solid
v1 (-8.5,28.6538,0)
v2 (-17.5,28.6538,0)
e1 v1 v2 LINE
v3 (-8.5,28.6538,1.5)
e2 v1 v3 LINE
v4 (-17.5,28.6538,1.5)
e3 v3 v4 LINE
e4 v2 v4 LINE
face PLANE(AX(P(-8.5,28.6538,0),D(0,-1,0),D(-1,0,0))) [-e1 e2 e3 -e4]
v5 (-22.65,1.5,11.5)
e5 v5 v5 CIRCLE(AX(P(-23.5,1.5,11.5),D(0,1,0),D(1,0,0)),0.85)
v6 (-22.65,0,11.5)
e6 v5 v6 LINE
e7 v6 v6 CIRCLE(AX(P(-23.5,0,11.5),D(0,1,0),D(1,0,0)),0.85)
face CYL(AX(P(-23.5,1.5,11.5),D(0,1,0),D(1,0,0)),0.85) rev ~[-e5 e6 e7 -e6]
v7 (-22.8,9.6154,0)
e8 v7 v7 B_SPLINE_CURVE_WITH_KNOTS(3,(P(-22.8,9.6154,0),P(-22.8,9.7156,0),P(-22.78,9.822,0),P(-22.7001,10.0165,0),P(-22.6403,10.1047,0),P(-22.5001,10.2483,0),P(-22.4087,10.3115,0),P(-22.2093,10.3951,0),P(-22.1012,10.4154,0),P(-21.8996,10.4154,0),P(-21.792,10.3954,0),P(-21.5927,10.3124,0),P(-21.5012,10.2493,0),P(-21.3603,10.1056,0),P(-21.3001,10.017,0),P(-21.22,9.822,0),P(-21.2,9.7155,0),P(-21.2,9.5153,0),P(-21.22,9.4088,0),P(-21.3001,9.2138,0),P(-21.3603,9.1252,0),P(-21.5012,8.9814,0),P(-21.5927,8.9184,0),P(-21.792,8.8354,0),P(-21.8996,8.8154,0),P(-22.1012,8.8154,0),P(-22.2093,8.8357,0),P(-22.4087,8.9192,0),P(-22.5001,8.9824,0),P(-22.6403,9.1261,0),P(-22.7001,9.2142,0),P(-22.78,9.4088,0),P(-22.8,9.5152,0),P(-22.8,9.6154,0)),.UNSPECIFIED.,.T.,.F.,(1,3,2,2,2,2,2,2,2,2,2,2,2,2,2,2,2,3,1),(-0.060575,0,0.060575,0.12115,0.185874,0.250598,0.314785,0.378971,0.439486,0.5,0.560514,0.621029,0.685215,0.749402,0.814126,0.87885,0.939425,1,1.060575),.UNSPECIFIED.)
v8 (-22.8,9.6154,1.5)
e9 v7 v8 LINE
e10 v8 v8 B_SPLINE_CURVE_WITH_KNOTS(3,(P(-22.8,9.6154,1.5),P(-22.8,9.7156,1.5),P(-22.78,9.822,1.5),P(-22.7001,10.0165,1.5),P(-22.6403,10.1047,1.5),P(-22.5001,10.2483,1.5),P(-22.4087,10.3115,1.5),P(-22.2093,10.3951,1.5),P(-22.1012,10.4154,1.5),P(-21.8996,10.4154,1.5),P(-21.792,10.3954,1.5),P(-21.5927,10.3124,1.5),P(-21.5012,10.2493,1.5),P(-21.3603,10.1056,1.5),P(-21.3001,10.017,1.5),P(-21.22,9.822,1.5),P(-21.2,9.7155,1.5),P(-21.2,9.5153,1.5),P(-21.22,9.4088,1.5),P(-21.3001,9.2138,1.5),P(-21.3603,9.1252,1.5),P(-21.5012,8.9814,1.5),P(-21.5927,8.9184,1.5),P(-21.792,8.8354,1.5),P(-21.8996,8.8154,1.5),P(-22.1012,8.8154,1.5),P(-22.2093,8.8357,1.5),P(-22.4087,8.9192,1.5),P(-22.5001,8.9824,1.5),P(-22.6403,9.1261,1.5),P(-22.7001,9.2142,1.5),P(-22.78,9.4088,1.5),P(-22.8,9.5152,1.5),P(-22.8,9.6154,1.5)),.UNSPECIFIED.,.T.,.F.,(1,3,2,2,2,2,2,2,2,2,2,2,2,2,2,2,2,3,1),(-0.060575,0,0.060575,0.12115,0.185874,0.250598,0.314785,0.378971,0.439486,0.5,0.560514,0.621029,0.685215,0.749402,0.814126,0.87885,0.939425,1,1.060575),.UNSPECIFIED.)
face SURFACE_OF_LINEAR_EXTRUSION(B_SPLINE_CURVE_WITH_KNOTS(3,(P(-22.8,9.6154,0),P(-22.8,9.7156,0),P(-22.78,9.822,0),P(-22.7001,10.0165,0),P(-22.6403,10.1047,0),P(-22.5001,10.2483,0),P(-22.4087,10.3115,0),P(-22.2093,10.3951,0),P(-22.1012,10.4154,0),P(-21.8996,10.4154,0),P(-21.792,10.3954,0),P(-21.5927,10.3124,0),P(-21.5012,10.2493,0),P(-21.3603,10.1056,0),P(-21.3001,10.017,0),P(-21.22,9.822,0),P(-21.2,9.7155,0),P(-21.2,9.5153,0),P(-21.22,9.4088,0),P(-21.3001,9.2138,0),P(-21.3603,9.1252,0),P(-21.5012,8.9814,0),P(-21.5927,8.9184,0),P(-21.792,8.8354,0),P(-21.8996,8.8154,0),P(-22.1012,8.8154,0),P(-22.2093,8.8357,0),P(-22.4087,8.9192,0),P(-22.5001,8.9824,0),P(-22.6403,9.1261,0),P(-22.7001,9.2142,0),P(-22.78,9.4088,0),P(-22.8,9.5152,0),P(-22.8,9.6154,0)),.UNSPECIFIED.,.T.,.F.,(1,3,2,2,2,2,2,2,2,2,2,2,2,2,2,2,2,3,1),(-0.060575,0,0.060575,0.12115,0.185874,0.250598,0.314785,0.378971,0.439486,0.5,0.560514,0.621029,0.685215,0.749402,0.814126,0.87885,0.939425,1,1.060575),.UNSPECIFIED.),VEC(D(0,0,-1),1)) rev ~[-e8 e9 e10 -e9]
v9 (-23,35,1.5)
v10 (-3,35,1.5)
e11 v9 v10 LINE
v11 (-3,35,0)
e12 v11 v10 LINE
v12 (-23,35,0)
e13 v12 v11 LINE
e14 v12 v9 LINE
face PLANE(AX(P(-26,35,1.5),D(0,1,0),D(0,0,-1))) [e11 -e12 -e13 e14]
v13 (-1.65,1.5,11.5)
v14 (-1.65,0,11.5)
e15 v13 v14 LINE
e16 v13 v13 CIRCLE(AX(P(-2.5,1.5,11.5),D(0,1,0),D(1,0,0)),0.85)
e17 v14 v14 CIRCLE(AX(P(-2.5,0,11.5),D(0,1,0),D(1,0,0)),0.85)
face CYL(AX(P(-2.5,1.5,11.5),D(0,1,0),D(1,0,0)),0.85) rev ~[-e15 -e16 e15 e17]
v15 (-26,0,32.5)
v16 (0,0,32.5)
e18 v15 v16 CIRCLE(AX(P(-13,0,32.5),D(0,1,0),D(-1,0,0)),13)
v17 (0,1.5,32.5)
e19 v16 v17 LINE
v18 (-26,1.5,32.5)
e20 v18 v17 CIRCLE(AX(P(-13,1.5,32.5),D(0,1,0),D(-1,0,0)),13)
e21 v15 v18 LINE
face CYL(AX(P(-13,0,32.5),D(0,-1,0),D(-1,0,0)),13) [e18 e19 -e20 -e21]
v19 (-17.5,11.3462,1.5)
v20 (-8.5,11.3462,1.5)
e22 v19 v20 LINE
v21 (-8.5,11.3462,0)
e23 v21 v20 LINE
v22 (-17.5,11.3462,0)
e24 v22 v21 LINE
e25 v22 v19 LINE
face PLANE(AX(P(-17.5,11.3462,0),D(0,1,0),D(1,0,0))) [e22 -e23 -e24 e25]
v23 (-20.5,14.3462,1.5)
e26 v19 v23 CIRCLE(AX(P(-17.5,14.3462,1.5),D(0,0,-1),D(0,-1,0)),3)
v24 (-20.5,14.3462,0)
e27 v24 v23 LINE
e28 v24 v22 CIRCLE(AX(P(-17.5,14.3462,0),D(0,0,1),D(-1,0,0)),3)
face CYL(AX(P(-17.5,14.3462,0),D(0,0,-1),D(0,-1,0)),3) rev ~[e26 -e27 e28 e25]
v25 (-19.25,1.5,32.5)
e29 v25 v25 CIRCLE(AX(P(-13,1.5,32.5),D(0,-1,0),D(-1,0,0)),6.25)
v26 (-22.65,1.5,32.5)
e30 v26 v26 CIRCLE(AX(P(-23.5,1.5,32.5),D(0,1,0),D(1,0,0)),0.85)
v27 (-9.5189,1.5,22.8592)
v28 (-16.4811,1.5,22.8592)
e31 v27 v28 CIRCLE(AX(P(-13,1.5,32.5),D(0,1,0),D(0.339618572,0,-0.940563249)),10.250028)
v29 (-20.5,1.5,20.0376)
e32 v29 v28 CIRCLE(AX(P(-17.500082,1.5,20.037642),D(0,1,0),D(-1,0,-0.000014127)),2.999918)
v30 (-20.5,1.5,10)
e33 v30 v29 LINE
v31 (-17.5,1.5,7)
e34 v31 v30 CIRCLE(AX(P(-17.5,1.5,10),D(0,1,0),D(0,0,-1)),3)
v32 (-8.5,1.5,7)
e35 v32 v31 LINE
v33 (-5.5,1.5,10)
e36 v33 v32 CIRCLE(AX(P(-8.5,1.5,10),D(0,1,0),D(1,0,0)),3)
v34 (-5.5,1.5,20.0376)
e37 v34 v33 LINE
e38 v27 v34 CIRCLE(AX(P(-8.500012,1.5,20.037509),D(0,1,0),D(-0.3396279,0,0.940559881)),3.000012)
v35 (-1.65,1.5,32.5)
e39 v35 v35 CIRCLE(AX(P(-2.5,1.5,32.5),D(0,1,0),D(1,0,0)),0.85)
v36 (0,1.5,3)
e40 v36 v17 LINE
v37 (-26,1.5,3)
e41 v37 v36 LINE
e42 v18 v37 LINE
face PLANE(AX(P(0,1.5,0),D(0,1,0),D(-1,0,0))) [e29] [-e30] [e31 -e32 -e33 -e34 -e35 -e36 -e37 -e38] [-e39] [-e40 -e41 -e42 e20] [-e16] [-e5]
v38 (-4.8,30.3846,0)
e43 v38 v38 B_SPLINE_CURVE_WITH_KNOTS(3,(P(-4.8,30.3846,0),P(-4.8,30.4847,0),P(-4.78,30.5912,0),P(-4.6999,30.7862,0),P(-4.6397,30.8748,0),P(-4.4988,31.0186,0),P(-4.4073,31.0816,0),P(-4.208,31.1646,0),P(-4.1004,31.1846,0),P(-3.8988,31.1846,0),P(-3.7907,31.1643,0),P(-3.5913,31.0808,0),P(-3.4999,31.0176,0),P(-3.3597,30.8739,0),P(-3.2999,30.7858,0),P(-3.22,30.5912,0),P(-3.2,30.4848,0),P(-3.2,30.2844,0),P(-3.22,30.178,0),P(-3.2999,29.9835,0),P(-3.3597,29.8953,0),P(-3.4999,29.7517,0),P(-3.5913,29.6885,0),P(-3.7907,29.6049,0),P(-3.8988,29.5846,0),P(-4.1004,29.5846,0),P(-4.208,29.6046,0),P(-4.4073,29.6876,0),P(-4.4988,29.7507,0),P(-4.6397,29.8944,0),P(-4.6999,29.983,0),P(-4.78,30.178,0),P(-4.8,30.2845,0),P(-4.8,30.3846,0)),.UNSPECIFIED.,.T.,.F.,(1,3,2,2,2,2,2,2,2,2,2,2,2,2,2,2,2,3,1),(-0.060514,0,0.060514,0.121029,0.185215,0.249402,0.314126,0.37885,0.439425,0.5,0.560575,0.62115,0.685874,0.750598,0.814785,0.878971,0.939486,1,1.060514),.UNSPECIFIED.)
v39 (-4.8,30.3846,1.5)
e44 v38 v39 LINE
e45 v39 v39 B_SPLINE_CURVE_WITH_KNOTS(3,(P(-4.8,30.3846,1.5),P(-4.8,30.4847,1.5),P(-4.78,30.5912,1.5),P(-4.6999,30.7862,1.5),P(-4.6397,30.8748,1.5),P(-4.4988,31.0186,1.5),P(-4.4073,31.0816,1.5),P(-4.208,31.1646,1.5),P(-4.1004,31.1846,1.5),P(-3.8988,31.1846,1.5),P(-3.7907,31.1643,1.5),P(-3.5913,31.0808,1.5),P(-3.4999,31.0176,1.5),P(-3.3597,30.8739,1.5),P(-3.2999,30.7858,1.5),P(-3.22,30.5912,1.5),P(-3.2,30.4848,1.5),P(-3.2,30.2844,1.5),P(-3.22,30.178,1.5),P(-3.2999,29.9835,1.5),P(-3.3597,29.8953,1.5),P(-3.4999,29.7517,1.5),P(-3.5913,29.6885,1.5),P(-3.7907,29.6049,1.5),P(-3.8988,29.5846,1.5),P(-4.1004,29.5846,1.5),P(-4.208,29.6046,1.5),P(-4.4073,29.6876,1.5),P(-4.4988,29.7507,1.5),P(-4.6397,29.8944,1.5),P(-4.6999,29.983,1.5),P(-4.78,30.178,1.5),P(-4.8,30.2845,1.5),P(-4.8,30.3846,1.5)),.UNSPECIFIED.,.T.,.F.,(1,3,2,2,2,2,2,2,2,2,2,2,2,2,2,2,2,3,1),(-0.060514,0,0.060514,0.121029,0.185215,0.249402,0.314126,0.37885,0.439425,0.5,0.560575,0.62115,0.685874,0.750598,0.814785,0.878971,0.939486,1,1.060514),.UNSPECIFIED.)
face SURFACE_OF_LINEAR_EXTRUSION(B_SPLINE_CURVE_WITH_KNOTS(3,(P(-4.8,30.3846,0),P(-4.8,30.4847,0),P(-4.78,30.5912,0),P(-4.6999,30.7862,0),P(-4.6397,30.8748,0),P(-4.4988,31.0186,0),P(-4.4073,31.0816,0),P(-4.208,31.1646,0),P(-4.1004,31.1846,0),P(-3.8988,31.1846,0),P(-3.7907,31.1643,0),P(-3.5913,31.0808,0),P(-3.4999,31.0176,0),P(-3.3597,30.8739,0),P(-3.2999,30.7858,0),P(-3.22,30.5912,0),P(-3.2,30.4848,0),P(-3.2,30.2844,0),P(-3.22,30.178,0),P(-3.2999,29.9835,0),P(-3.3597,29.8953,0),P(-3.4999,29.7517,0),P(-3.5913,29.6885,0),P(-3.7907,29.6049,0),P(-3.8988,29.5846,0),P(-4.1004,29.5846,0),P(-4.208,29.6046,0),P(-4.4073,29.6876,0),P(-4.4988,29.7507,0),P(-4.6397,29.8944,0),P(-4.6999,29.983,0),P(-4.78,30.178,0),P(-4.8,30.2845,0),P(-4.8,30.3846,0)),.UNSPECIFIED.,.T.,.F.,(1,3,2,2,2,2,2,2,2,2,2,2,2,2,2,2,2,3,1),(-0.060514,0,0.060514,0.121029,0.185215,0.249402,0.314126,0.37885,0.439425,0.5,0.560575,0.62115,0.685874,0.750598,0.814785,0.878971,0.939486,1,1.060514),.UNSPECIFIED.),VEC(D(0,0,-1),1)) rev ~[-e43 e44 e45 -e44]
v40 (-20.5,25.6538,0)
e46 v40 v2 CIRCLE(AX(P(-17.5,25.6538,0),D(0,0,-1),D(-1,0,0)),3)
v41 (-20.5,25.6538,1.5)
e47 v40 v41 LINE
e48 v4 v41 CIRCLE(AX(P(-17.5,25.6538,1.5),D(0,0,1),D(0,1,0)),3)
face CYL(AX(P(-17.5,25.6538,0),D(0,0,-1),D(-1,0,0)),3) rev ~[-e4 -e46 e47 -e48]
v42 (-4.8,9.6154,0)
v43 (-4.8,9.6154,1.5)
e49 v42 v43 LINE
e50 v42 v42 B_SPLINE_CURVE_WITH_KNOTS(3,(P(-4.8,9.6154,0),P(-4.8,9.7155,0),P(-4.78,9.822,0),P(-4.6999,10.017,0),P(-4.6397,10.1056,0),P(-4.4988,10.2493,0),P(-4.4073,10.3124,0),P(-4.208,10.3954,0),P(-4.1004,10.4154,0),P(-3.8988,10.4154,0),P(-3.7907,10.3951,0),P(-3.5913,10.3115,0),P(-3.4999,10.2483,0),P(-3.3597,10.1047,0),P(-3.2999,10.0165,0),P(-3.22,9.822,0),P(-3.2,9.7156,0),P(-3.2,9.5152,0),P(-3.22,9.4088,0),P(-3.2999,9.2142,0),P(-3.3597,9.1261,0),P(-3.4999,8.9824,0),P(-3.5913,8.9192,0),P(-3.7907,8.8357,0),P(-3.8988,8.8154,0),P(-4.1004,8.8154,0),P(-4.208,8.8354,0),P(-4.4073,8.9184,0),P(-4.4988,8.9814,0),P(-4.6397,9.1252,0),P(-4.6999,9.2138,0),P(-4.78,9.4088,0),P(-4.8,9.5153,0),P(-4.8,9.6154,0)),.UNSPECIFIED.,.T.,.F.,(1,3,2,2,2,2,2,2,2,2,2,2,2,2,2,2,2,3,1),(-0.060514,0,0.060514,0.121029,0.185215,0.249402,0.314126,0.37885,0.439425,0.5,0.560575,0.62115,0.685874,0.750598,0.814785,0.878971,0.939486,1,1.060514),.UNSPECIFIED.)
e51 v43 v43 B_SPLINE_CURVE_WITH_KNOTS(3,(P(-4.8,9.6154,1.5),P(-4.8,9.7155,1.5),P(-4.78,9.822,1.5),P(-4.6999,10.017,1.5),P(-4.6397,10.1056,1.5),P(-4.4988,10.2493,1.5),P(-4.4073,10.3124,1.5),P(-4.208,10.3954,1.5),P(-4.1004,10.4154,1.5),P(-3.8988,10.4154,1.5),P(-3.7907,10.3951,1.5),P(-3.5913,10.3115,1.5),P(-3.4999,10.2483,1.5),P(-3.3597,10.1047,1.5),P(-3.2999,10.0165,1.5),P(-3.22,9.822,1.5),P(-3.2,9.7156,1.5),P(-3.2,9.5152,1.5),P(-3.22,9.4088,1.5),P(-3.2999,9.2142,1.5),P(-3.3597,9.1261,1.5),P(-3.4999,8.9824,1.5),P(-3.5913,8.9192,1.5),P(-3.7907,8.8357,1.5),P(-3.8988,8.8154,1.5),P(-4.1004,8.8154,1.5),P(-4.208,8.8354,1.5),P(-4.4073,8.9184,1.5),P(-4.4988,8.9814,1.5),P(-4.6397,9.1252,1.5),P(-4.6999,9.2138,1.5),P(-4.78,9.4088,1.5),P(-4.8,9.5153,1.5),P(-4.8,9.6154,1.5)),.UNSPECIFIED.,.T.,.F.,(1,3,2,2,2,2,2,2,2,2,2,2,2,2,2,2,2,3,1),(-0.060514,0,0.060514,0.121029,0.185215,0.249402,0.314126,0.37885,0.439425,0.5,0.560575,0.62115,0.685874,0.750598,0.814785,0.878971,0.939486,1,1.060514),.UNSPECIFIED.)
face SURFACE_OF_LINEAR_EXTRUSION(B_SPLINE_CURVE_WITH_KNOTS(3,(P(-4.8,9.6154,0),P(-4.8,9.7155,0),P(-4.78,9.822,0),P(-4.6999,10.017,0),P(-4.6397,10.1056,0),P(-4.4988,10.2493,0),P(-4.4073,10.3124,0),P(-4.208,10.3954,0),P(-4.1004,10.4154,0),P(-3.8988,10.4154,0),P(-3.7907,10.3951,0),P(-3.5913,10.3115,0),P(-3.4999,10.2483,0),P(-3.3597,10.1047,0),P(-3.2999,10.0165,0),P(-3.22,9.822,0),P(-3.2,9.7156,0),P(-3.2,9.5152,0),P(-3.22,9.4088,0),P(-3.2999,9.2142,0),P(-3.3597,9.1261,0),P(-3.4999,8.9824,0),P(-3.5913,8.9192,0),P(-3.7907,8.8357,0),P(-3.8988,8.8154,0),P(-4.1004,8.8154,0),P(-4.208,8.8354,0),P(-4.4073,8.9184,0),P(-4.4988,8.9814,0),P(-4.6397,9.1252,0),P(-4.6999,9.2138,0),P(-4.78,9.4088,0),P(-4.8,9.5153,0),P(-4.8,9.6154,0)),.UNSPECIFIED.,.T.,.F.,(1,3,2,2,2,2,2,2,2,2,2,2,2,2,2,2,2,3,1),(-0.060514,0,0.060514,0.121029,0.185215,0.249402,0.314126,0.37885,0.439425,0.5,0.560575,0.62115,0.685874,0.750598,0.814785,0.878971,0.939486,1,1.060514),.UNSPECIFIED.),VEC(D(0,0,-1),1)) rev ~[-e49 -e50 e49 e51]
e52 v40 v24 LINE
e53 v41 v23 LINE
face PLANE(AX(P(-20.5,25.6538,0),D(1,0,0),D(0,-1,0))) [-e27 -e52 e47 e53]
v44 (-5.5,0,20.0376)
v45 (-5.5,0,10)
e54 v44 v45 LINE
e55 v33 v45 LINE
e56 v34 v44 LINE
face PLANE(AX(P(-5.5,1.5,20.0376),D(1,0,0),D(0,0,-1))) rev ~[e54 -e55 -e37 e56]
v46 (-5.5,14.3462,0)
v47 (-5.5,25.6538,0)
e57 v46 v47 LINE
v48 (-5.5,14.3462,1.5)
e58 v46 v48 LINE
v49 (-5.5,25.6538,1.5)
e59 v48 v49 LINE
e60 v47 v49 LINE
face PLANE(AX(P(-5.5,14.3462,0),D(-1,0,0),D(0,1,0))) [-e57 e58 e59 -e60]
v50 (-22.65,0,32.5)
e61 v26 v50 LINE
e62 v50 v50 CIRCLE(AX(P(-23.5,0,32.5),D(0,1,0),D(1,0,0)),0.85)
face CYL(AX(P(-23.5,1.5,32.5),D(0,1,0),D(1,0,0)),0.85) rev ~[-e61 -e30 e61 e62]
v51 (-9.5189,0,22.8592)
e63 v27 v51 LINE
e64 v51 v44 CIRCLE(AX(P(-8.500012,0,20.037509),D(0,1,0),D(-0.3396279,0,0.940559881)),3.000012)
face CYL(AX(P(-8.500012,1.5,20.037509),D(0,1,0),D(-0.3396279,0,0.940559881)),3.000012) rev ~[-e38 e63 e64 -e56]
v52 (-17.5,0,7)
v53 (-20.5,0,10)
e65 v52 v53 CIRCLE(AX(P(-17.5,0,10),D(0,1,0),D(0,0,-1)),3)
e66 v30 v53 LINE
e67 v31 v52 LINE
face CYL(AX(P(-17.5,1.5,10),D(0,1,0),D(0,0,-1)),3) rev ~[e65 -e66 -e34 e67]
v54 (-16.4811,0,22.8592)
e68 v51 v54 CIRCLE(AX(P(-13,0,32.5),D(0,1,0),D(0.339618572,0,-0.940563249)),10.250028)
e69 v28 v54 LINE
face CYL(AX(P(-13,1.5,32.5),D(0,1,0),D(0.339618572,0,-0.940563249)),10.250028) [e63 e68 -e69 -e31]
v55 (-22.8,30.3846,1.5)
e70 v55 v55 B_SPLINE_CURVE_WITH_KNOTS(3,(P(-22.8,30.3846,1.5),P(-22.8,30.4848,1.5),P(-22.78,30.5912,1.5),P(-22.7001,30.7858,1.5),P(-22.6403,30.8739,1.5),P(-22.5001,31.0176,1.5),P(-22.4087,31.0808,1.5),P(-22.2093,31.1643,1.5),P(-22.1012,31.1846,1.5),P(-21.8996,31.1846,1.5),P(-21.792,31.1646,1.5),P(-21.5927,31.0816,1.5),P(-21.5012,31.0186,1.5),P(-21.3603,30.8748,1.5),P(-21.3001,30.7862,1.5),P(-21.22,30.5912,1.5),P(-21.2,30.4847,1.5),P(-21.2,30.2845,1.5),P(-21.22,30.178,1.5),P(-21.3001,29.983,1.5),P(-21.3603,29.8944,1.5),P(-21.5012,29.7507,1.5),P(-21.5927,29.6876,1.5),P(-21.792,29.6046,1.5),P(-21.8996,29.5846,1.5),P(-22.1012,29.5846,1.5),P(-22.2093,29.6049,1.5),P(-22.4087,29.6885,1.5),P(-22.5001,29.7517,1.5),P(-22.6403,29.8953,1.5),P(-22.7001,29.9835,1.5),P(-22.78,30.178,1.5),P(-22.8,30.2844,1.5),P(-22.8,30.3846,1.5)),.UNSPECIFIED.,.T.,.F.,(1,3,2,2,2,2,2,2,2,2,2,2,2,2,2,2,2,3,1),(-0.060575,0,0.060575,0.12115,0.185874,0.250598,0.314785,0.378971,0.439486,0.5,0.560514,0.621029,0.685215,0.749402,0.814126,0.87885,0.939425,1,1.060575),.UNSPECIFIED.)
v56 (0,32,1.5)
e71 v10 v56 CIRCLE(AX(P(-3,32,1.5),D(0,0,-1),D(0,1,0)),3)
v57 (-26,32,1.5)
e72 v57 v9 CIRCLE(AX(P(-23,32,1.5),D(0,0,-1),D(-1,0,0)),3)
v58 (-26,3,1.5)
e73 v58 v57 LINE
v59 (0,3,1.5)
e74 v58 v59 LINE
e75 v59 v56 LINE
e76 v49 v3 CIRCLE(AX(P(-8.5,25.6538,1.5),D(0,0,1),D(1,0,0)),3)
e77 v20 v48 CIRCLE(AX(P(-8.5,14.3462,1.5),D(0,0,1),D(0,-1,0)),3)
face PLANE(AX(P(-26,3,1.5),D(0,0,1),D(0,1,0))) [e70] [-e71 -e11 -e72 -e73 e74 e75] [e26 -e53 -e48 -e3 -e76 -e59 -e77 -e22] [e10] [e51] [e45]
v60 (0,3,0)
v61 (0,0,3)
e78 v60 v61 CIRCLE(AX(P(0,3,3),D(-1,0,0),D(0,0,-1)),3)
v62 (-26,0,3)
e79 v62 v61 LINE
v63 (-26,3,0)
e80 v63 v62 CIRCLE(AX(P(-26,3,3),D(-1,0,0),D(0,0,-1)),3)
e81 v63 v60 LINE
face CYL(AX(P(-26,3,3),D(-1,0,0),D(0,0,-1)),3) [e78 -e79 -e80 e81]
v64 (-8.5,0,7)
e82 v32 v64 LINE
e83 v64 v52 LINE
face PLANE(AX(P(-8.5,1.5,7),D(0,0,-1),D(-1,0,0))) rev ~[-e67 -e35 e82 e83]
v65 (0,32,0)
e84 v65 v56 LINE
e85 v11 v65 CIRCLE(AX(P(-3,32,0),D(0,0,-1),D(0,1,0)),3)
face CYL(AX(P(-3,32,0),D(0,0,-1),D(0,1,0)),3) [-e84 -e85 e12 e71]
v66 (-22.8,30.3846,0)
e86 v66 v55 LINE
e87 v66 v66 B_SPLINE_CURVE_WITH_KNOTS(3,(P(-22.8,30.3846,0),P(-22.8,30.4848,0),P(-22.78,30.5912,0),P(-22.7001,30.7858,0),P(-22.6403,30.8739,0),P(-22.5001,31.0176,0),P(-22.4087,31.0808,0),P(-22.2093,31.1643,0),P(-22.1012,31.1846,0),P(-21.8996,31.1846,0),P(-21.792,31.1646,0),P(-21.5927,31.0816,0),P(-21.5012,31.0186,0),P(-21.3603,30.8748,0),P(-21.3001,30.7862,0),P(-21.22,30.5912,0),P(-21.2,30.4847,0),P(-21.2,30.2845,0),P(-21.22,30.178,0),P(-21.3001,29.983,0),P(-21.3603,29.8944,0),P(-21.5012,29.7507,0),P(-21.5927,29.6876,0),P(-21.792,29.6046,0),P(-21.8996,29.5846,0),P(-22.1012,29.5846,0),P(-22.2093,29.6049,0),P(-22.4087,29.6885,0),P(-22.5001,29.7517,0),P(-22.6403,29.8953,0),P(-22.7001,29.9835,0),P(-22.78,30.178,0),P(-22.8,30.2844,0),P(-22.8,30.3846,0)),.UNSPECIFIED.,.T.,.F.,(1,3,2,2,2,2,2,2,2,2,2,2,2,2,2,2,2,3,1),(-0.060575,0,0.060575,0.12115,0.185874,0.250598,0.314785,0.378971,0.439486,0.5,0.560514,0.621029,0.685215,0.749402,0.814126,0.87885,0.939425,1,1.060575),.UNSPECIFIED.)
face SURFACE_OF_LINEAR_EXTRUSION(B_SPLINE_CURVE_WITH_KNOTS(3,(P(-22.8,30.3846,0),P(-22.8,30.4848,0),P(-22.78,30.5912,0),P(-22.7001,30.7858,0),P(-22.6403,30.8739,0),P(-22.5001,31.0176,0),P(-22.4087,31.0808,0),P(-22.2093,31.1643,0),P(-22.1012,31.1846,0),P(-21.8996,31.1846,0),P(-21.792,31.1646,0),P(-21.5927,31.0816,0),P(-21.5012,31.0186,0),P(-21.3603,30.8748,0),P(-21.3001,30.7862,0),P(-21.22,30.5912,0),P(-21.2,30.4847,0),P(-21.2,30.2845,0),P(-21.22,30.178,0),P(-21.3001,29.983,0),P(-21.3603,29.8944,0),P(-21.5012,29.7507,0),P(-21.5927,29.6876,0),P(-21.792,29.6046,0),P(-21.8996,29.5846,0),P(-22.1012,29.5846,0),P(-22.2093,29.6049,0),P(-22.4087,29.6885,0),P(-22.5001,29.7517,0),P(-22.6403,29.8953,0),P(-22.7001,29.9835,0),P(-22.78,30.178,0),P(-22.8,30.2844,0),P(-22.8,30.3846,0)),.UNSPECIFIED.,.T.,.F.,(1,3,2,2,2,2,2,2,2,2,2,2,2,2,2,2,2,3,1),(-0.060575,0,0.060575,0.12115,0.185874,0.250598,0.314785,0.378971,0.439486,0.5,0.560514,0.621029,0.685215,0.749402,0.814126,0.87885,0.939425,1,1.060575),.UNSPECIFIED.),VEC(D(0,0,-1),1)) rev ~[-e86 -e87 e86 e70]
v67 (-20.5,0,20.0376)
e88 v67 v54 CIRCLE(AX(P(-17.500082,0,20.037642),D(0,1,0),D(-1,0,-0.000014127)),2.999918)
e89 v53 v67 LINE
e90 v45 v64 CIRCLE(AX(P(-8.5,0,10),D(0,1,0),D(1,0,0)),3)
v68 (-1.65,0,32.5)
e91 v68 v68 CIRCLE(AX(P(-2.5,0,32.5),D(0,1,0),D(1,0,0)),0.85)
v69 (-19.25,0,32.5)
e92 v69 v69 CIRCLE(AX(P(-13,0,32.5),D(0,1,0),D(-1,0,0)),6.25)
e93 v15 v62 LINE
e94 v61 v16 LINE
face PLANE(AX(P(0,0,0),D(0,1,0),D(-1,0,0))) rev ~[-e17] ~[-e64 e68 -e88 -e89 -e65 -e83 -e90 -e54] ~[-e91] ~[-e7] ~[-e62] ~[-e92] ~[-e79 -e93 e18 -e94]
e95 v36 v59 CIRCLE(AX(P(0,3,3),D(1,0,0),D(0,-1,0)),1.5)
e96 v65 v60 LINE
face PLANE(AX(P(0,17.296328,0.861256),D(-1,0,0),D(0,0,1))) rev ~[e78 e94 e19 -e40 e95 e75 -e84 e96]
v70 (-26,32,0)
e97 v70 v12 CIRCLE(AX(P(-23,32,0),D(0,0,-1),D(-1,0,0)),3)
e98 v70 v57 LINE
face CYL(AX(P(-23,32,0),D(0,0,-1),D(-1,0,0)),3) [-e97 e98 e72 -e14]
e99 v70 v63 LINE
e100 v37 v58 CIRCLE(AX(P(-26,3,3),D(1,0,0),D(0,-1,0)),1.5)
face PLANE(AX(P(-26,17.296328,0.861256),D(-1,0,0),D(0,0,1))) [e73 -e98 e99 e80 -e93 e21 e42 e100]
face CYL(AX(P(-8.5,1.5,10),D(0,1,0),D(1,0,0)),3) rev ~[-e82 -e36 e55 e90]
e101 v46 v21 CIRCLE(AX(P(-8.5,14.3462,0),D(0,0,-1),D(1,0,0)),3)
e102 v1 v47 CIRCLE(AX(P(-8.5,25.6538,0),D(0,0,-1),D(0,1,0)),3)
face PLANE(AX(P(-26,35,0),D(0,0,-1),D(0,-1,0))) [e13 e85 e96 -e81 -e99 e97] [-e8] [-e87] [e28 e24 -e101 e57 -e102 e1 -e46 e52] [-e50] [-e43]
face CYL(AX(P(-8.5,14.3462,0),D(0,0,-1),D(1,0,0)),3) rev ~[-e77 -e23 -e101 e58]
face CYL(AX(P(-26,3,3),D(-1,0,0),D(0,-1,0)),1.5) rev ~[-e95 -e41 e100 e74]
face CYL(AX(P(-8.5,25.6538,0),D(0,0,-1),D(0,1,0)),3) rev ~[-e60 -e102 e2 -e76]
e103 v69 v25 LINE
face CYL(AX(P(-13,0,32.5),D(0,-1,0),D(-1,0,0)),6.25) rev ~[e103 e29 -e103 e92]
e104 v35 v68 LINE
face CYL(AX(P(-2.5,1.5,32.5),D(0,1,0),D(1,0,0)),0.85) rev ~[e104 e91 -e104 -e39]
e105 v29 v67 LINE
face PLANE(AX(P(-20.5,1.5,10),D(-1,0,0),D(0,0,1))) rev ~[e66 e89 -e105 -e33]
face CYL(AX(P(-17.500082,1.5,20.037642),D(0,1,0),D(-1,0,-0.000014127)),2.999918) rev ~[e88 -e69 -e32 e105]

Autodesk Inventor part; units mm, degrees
ref_plane "YZ Plane" through (0, 0, 0) normal (1, 0, 0) x (0, 1, 0)
ref_plane "XZ Plane" through (0, 0, 0) normal (0, 1, 0) x (-1, 0, 0)
ref_plane "XY Plane" through (0, 0, 0) normal (0, 0, 1) x (1, 0, 0)
sketch "スケッチ1" plane through (0, 0, 0) normal (0, 1, 0) x (-1, 0, 0)
  line L0 (26, 0) -> (0, 0)
  line L1 (0, 0) -> (0, -89.5474)
  line L2 (0, -89.5474) -> (26, -89.5474)
  line L3 (26, -89.5474) -> (26, 0)
  line L4 (26, 0) -> (0, 0)
  line L5 (0, 0) -> (0, 70)
  line L6 (0, 70) -> (26, 70)
  line L7 (26, 70) -> (26, 0)
  line L8 (26, 32.5) -> (0, 32.5)
  circle A0 centre (13, 32.5) radius 6.25
  circle A1 centre (13, 32.5) radius 13
  point P0 (26, 32.5)
  point P1 (0, 32.5)
  dimension "d2" = 70
  dimension "d3" = 26
  dimension "d4" = 32.5
  dimension "d5" = 12.5
extrude "プレート1" add sketch "スケッチ1" along normal blind 1.5 contours L0 L5 A1 L7 | A1 L8 A0 | L8 A0 A1
sketch "スケッチ2" plane through (-26, 0, 1.5) normal (0, 0, -1) x (-1, 0, 0)
  line L0 (-26, 0) -> (0, 0)
  line L1 (0, 0) -> (0, 35)
  line L2 (0, 35) -> (-26, 35)
  line L3 (-26, 35) -> (-26, 0)
edge flange "フランジ1" height 35 angle 90 thickness 1.5 bend radius 1.5 thickness toward (0, 0, -1) relief tear relief width 1.5 relief depth 0.75 edges at (-13, 1.5, 0) wall of the first edge with corners at (0, 0, 1.5) (-26, 0, 1.5) (-26, 35, 1.5) (0, 35, 1.5)
bend "曲げ1"
corner "コーナー1"
sketch "スケッチ3" plane through (0, 1.5, 0) normal (0, 1, 0) x (1, 0, 0)
  circle A0 centre (-23.5, -32.5) radius 0.85 projected
  circle A1 centre (-23.5, -11.5) radius 0.85 projected
  circle A2 centre (-2.5, -11.5) radius 0.85 projected
  circle A3 centre (-2.5, -32.5) radius 0.85 projected
  point P0 (0, 0)
extrude "切り取り1" cut sketch "スケッチ3" against normal blind 1.5
sketch "スケッチ4" plane through (0, 35, 0) normal (0, 0, -1) x (-1, 0, 0)
  spline S0 degree 3 poles (4.8, -25.3846) (4.8, -25.2845) (4.78, -25.178) (4.6999, -24.983) (4.6397, -24.8944) (4.4988, -24.7507) (4.4073, -24.6876) (4.208, -24.6046) (4.1004, -24.5846) (3.8988, -24.5846) (3.7907, -24.6049) (3.5913, -24.6885) (3.4999, -24.7517) (3.3597, -24.8953) (3.2999, -24.9835) (3.22, -25.178) (3.2, -25.2844) (3.2, -25.4848) (3.22, -25.5912) (3.2999, -25.7858) (3.3597, -25.8739) (3.4999, -26.0176) (3.5913, -26.0808) (3.7907, -26.1643) (3.8988, -26.1846) (4.1004, -26.1846) (4.208, -26.1646) (4.4073, -26.0816) (4.4988, -26.0186) (4.6397, -25.8748) (4.6999, -25.7862) (4.78, -25.5912) (4.8, -25.4847) (4.8, -25.3846) knots 0 0 0 0 0.060514 0.060514 0.121029 0.121029 0.185215 0.185215 0.249402 0.249402 0.314126 0.314126 0.37885 0.37885 0.439425 0.439425 0.5 0.5 0.560575 0.560575 0.62115 0.62115 0.685874 0.685874 0.750598 0.750598 0.814785 0.814785 0.878971 0.878971 0.939486 0.939486 1 1 1 1
  spline S1 degree 3 poles (4.8, -4.6154) (4.8, -4.5153) (4.78, -4.4088) (4.6999, -4.2138) (4.6397, -4.1252) (4.4988, -3.9814) (4.4073, -3.9184) (4.208, -3.8354) (4.1004, -3.8154) (3.8988, -3.8154) (3.7907, -3.8357) (3.5913, -3.9192) (3.4999, -3.9824) (3.3597, -4.1261) (3.2999, -4.2142) (3.22, -4.4088) (3.2, -4.5152) (3.2, -4.7156) (3.22, -4.822) (3.2999, -5.0165) (3.3597, -5.1047) (3.4999, -5.2483) (3.5913, -5.3115) (3.7907, -5.3951) (3.8988, -5.4154) (4.1004, -5.4154) (4.208, -5.3954) (4.4073, -5.3124) (4.4988, -5.2493) (4.6397, -5.1056) (4.6999, -5.017) (4.78, -4.822) (4.8, -4.7155) (4.8, -4.6154) knots 0 0 0 0 0.060514 0.060514 0.121029 0.121029 0.185215 0.185215 0.249402 0.249402 0.314126 0.314126 0.37885 0.37885 0.439425 0.439425 0.5 0.5 0.560575 0.560575 0.62115 0.62115 0.685874 0.685874 0.750598 0.750598 0.814785 0.814785 0.878971 0.878971 0.939486 0.939486 1 1 1 1
  spline S2 degree 3 poles (22.8, -4.6154) (22.8, -4.5152) (22.78, -4.4088) (22.7001, -4.2142) (22.6403, -4.1261) (22.5001, -3.9824) (22.4087, -3.9192) (22.2093, -3.8357) (22.1012, -3.8154) (21.8996, -3.8154) (21.792, -3.8354) (21.5927, -3.9184) (21.5012, -3.9814) (21.3603, -4.1252) (21.3001, -4.2138) (21.22, -4.4088) (21.2, -4.5153) (21.2, -4.7155) (21.22, -4.822) (21.3001, -5.017) (21.3603, -5.1056) (21.5012, -5.2493) (21.5927, -5.3124) (21.792, -5.3954) (21.8996, -5.4154) (22.1012, -5.4154) (22.2093, -5.3951) (22.4087, -5.3115) (22.5001, -5.2483) (22.6403, -5.1047) (22.7001, -5.0165) (22.78, -4.822) (22.8, -4.7156) (22.8, -4.6154) knots 0 0 0 0 0.060575 0.060575 0.12115 0.12115 0.185874 0.185874 0.250598 0.250598 0.314785 0.314785 0.378971 0.378971 0.439486 0.439486 0.5 0.5 0.560514 0.560514 0.621029 0.621029 0.685215 0.685215 0.749402 0.749402 0.814126 0.814126 0.87885 0.87885 0.939425 0.939425 1 1 1 1
  spline S3 degree 3 poles (22.8, -25.3846) (22.8, -25.2844) (22.78, -25.178) (22.7001, -24.9835) (22.6403, -24.8953) (22.5001, -24.7517) (22.4087, -24.6885) (22.2093, -24.6049) (22.1012, -24.5846) (21.8996, -24.5846) (21.792, -24.6046) (21.5927, -24.6876) (21.5012, -24.7507) (21.3603, -24.8944) (21.3001, -24.983) (21.22, -25.178) (21.2, -25.2845) (21.2, -25.4847) (21.22, -25.5912) (21.3001, -25.7862) (21.3603, -25.8748) (21.5012, -26.0186) (21.5927, -26.0816) (21.792, -26.1646) (21.8996, -26.1846) (22.1012, -26.1846) (22.2093, -26.1643) (22.4087, -26.0808) (22.5001, -26.0176) (22.6403, -25.8739) (22.7001, -25.7858) (22.78, -25.5912) (22.8, -25.4848) (22.8, -25.3846) knots 0 0 0 0 0.060575 0.060575 0.12115 0.12115 0.185874 0.185874 0.250598 0.250598 0.314785 0.314785 0.378971 0.378971 0.439486 0.439486 0.5 0.5 0.560514 0.560514 0.621029 0.621029 0.685215 0.685215 0.749402 0.749402 0.814126 0.814126 0.87885 0.87885 0.939425 0.939425 1 1 1 1
  point P0 (0, -35)
  point P1 (4.8, -25.3846)
  point P2 (4.8, -4.6154)
  point P3 (22.8, -4.6154)
  point P4 (22.8, -25.3846)
extrude "切り取り2" cut sketch "スケッチ4" against normal blind 1.5
sketch "スケッチ5" plane through (0, 1.5, 0) normal (0, 1, 0) x (1, 0, 0)
  line L0 (-20.5, -10) -> (-20.5, -20.0376) projected
  arc A0 (-20.5, -20.0376) -> (-16.4811, -22.8592) centre (-17.5, -20.0376) ccw projected
  arc A1 (-9.5189, -22.8592) -> (-16.4811, -22.8592) centre (-13, -32.5) ccw projected
  arc A2 (-9.5189, -22.8592) -> (-5.5, -20.0376) centre (-8.5, -20.0376) ccw projected
  line L1 (-5.5, -20.0376) -> (-5.5, -10) projected
  arc A3 (-5.5, -10) -> (-8.5, -7) centre (-8.5, -10) ccw projected
  line L2 (-8.5, -7) -> (-17.5, -7) projected
  arc A4 (-17.5, -7) -> (-20.5, -10) centre (-17.5, -10) ccw projected
  line L3 (-26, -3) -> (0, -3) projected
  line L4 (0, -32.5) -> (0, -3) projected
  arc A5 (-26, -32.5) -> (0, -32.5) centre (-13, -32.5) ccw projected
  line L5 (-26, -3) -> (-26, -32.5) projected
  circle A6 centre (-13, -32.5) radius 6.25 projected
  circle A7 centre (-23.5, -32.5) radius 0.85 projected
  circle A8 centre (-2.5, -11.5) radius 0.85 projected
  circle A9 centre (-2.5, -32.5) radius 0.85 projected
  circle A10 centre (-23.5, -11.5) radius 0.85 projected
  point P0 (0, 0)
extrude "切り取り3" cut sketch "スケッチ5" against normal blind 1.5 contours A4 L2 A3 L1 A2 A1 A0 L0
sketch "スケッチ6" plane through (0, 35, 0) normal (0, 0, -1) x (-1, 0, 0)
  line L0 (26, 0) -> (26, -32) projected
  line L1 (0, 0) -> (26, 0) projected
  line L2 (0, -32) -> (0, 0) projected
  circle A0 centre (22, -25.3846) radius 0.8 projected
  circle A1 centre (4, -25.3846) radius 0.8 projected
  circle A2 centre (4, -4.6154) radius 0.8 projected
  circle A3 centre (22, -4.6154) radius 0.8 projected
  line L3 (22, -25.3846) -> (4, -4.6154)
  line L4 (4, -25.3846) -> (22, -4.6154)
  line L5 (17.5, -23.6538) -> (8.5, -23.6538)
  line L6 (5.5, -20.6538) -> (5.5, -9.3462)
  line L7 (8.5, -6.3462) -> (17.5, -6.3462)
  line L8 (20.5, -9.3462) -> (20.5, -20.6538)
  arc A4 (26, -3) -> (23, 0) centre (23, -3) ccw
  line L9 (0, 0) -> (26, 0) projected
  arc A5 (3, 0) -> (0, -3) centre (3, -3) ccw
  arc A6 (17.5, -23.6538) -> (20.5, -20.6538) centre (17.5, -20.6538) ccw
  arc A7 (5.5, -20.6538) -> (8.5, -23.6538) centre (8.5, -20.6538) ccw
  arc A8 (8.5, -6.3462) -> (5.5, -9.3462) centre (8.5, -9.3462) ccw
  arc A9 (20.5, -9.3462) -> (17.5, -6.3462) centre (17.5, -9.3462) ccw
  point P0 (0, -35)
  point P1 (20.5, -23.6538)
  point P2 (5.5, -6.3462)
  point P3 (5.5, -23.6538)
  dimension "d29" = 1.5
  dimension "d30" = 3
  dimension "d31" = 3
  dimension "d32" = 3
extrude "切り取り4" cut sketch "スケッチ6" against normal blind 1.5 contours L0 A4 L1 | L1 A5 L2 | A6 L5 A7 L4 L3 | L3 L4 A9 L8 A6 | L4 A7 L6 A8 L3 | L3 A8 L7 A9 L4
equation "\"d23\" = Thickness"
equation "\"d25\" = Thickness"
equation "\"d27\" = Thickness"
equation "\"d33\" = Thickness"
equation "\"d12\" = Thickness"
equation "\"d13\" = BendReliefWidth"
equation "\"d14\" = BendReliefDepth"
equation "\"d15\" = MinimumRemnant"
equation "\"d16\" = TransitionRadius"
equation "\"d19\" = BendRadius"
equation "\"d20\" = CornerReliefSize"
equation "\"d21\" = GapSize"
equation "\"d22\" = JacobiRadiusSize"
equation "\"BendRadius\" = Thickness"
equation "\"BendReliefWidth\" = Thickness"
equation "\"BendReliefDepth\" = 0.5 * Thickness"
equation "\"CornerReliefSize\" = 4 * Thickness"
equation "\"MinimumRemnant\" = 2 * Thickness"
equation "\"TransitionRadius\" = BendRadius"
equation "\"JacobiRadiusSize\" = BendRadius"
equation "\"GapSize\" = Thickness"
equation "\"Thickness\" = 1.5"
properties part number "toe_back" material "アルミニウム 6061"
